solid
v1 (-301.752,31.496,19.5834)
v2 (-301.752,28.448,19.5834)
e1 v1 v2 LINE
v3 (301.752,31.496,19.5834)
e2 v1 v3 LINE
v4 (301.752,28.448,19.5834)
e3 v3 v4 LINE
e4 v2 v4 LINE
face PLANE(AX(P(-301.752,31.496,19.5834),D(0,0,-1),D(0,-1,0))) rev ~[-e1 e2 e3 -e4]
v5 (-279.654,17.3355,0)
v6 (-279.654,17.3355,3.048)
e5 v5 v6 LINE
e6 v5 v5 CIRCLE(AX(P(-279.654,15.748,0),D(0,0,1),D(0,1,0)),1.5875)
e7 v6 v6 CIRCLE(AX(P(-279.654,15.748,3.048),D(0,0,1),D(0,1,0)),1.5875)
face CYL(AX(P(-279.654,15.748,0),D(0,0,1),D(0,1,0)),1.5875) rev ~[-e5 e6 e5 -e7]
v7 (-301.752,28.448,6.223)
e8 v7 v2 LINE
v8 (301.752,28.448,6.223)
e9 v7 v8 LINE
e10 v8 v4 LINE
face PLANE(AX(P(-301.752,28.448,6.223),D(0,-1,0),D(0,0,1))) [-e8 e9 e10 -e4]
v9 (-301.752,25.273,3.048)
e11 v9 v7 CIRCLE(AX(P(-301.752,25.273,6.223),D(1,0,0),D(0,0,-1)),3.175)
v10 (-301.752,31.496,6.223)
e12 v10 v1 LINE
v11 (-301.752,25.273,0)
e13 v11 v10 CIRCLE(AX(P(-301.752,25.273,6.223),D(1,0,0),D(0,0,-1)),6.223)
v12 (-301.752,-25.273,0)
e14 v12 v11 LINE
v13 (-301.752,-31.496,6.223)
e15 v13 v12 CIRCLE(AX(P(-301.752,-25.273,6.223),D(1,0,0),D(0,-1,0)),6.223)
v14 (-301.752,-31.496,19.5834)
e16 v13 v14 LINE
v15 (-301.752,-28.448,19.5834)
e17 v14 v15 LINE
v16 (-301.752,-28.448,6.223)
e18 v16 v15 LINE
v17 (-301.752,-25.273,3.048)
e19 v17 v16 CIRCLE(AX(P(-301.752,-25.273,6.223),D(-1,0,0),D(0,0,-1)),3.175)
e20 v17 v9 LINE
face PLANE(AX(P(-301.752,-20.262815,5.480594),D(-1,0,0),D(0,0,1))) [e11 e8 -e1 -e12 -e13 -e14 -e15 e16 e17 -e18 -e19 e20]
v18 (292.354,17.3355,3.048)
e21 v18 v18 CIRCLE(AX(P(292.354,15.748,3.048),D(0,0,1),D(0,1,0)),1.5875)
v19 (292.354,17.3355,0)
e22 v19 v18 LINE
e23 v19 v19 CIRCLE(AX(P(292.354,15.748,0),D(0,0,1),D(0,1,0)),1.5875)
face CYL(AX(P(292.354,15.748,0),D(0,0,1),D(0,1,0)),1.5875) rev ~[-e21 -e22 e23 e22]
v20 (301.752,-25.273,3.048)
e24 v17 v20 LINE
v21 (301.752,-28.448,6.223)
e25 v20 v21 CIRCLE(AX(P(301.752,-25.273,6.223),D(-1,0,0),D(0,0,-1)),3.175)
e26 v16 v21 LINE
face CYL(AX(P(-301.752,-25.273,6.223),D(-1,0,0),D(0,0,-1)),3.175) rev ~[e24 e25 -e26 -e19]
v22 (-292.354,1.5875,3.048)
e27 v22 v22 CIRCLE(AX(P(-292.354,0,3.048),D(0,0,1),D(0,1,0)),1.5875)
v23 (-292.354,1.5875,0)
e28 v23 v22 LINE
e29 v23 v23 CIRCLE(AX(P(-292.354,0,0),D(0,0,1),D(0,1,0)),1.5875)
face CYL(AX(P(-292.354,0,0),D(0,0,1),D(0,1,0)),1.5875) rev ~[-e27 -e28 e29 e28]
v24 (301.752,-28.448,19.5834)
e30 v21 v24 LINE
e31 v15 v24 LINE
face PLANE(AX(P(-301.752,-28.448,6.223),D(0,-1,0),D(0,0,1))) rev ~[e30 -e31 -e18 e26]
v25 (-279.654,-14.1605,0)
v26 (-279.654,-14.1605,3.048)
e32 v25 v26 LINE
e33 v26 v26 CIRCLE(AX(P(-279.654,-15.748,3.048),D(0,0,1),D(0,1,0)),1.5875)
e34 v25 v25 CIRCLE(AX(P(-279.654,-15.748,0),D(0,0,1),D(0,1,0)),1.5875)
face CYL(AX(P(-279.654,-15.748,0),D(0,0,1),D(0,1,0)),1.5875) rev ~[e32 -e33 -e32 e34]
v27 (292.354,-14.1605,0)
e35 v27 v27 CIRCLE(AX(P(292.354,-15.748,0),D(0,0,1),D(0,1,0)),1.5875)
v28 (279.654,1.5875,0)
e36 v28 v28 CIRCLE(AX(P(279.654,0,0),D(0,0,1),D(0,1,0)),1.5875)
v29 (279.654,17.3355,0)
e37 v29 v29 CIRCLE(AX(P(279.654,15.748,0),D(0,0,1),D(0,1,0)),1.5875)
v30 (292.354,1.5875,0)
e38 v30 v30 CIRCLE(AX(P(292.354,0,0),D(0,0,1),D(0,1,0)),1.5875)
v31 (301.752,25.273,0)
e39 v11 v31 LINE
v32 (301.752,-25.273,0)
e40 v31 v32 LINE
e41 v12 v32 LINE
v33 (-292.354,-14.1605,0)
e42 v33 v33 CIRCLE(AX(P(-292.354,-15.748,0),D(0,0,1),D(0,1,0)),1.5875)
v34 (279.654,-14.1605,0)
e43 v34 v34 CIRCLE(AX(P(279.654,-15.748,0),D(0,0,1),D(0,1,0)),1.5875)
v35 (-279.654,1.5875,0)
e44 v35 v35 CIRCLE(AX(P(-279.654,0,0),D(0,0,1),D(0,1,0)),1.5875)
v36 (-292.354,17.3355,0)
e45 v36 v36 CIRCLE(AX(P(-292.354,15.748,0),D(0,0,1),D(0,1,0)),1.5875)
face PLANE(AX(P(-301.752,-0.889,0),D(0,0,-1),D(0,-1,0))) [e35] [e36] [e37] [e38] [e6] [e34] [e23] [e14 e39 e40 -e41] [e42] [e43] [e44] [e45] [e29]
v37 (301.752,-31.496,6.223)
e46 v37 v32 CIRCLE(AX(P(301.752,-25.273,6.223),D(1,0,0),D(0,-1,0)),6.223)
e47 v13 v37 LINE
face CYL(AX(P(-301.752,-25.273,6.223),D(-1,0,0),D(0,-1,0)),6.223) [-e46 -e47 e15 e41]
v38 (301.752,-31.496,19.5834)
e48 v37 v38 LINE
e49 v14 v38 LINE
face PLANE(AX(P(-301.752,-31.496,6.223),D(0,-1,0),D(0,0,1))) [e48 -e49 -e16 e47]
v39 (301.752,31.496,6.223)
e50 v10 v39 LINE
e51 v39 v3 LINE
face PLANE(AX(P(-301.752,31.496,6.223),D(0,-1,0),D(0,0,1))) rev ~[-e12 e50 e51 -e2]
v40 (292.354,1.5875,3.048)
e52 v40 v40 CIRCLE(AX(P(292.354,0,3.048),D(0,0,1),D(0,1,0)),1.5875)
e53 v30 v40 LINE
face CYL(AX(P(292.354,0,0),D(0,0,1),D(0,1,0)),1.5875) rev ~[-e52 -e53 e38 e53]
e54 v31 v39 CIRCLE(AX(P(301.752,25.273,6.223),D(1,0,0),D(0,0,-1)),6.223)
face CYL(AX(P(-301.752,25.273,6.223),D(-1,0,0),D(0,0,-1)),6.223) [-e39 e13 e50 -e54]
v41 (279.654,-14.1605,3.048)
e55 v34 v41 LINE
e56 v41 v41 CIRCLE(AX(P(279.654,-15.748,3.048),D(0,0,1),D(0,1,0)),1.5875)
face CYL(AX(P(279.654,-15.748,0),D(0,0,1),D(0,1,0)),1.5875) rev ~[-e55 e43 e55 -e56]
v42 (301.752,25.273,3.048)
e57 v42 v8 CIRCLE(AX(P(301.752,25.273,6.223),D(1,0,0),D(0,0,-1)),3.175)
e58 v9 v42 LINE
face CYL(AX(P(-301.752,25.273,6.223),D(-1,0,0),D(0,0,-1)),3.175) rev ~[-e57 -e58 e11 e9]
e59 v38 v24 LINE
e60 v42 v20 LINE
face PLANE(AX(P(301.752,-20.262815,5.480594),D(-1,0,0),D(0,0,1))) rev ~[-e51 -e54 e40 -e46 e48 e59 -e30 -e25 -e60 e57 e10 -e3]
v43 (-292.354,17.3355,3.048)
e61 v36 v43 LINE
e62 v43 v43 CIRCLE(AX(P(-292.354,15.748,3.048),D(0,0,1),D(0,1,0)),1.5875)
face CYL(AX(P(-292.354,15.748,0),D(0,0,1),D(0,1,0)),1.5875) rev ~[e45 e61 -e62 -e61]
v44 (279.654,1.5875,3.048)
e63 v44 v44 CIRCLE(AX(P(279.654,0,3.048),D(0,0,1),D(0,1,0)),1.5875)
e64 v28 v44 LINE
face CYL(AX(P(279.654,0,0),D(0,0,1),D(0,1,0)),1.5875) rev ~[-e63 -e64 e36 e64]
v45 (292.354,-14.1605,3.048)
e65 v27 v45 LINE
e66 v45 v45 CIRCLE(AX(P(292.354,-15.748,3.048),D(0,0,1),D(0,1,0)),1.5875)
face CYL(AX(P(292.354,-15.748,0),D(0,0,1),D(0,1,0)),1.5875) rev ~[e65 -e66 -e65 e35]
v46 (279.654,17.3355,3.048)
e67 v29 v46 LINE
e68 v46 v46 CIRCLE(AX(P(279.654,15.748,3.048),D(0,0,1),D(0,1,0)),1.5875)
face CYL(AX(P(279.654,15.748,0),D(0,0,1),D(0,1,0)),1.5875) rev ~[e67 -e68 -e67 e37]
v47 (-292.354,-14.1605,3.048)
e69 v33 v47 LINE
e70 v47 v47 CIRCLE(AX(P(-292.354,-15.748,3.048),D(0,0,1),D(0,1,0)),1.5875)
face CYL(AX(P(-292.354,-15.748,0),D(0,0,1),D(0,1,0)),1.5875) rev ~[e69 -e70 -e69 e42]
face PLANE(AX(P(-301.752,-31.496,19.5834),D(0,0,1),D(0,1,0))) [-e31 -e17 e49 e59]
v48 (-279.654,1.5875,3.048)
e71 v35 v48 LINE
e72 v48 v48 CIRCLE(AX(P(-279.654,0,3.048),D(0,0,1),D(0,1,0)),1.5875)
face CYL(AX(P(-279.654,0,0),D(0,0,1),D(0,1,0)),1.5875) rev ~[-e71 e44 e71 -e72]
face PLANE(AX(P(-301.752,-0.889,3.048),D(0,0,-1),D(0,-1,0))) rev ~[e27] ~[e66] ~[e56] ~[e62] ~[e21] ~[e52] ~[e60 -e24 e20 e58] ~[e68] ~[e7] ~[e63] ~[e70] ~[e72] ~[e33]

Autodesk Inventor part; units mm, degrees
ref_plane "YZ Plane" through (0, 0, 0) normal (1, 0, 0) x (0, 1, 0)
ref_plane "XZ Plane" through (0, 0, 0) normal (0, 1, 0) x (-1, 0, 0)
ref_plane "XY Plane" through (0, 0, 0) normal (0, 0, 1) x (1, 0, 0)
sketch "Sketch2" plane through (0, 0, 0) normal (0, 0, 1) x (1, 0, 0)
  line L0 (-301.752, 25.273) -> (301.752, 25.273)
  line L1 (301.752, 25.273) -> (301.752, -25.273)
  line L2 (301.752, -25.273) -> (-301.752, -25.273)
  line L3 (-301.752, -25.273) -> (-301.752, 25.273)
  point P0 (0, 0)
  dimension "d0" = 301.752
  dimension "d1" = 301.752
  dimension "d2" = 25.273
  dimension "d3" = 25.273
extrude "Plate1" add sketch "Sketch2" along normal blind 3.048
sketch "Sketch3" plane through (301.752, -25.273, 0) normal (1, 0, 0) x (0, 0, -1)
  line L0 (0, 50.546) -> (-3.048, 50.546)
  arc A0 (0, 50.546) -> (-6.223, 56.769) centre (-6.223, 50.546) ccw
  line L1 (-6.223, 50.546) -> (-6.223, 56.769) construction
  line L2 (-6.223, 50.546) -> (0, 50.546) construction
  line L3 (-6.223, 56.769) -> (-19.5834, 56.769)
  point P0 (0, 25.273)
  dimension "d5" = 90
  dimension "d6" = 6.223
  dimension "d7" = 6.223
  dimension "d8" = 13.3604
contour flange "Contour Flange1" sketch "Sketch3" thickness 3.048 bend radius 3.048 curves A0 L3 edges at (0, 25.273, 0) running between points at (-301.752, 25.273, 0) (301.752, 25.273, 0)
bend "Bend1"
corner "Corner1"
sketch "Sketch4" plane through (301.752, -25.273, 3.048) normal (1, 0, 0) x (0, 0, -1)
  line L0 (3.048, 0) -> (0, 0)
  arc A0 (-3.175, -6.223) -> (3.048, 0) centre (-3.175, 0) ccw
  line L1 (-3.175, 0) -> (-3.175, -6.223) construction
  line L2 (-3.175, 0) -> (3.048, 0) construction
  line L3 (-3.175, -6.223) -> (-16.5354, -6.223)
  point P0 (3.048, 25.273)
  dimension "d18" = 90
  dimension "d19" = 6.223
  dimension "d20" = 6.223
  dimension "d21" = 13.3604
contour flange "Contour Flange2" sketch "Sketch4" thickness 3.048 bend radius 3.048 curves L3 A0 edges at (0, -25.273, 0) running between points at (301.752, -25.273, 0) (-301.752, -25.273, 0)
bend "Bend2"
corner "Corner2"
sketch "Sketch5" plane through (0, 0, 0) normal (0, 0, -1) x (-1, 0, 0)
  line L0 (-301.752, 25.273) -> (-301.752, -25.273) projected
  line L1 (-301.752, -25.273) -> (301.752, -25.273) projected
  line L2 (301.752, -25.273) -> (301.752, 25.273) projected
  point P0 (0, 0)
  point P1 (-292.354, -15.748)
  point P2 (279.654, -15.748)
  dimension "d31" = 9.398
  dimension "d32" = 22.098
  dimension "d33" = 9.525
  dimension "d34" = 9.525
hole "Hole1" at (292.354, -15.748, 0) at (-279.654, -15.748, 0) direction (0, 0, 1) diameter 3.175 end through all
sketch "Sketch6" plane through (0, 0, 0) normal (0, 0, -1) x (-1, 0, 0)
  circle A0 centre (-292.354, -15.748) radius 1.5875 projected
  line L0 (301.752, -25.273) -> (301.752, 25.273) projected
  line L1 (-292.354, -15.748) -> (-277.2602, -15.748)
  point P0 (0, 0)
sketch "Sketch7" plane through (0, 0, 0) normal (0, 0, -1) x (-1, 0, 0)
  circle A0 centre (-292.354, -15.748) radius 1.5875 projected
  line L0 (301.752, -25.273) -> (301.752, 25.273) projected
  line L1 (-292.354, -15.748) -> (-292.354, -4.4863)
  point P0 (0, 0)
pattern_linear "Rectangular Pattern1" count 2 spacing 12.7 along (-1, 0, 0) count 3 spacing 15.748 along (0, 1, 0) of "Hole1"
equation "\"d34\" = d33"
equation "\"d40\" = Thickness"
equation "\"d9\" = BendReliefWidth"
equation "\"d10\" = BendReliefDepth"
equation "\"d11\" = MinimumRemnant"
equation "\"d12\" = BendRadius"
equation "\"d13\" = BendRadius"
equation "\"d15\" = CornerReliefSize"
equation "\"d16\" = GapSize"
equation "\"d17\" = JacobiRadiusSize"
equation "\"d22\" = BendReliefWidth"
equation "\"d23\" = BendReliefDepth"
equation "\"d24\" = MinimumRemnant"
equation "\"d25\" = BendRadius"
equation "\"d26\" = BendRadius"
equation "\"d28\" = CornerReliefSize"
equation "\"d29\" = GapSize"
equation "\"d30\" = JacobiRadiusSize"
equation "\"d1\" = d0"
equation "\"d3\" = d2"
equation "\"BendRadius\" = Thickness"
equation "\"BendReliefWidth\" = Thickness"
equation "\"BendReliefDepth\" = 0.5 * Thickness"
equation "\"CornerReliefSize\" = 4 * Thickness"
equation "\"MinimumRemnant\" = 2 * Thickness"
equation "\"TransitionRadius\" = BendRadius"
equation "\"JacobiRadiusSize\" = BendRadius"
equation "\"GapSize\" = Thickness"
equation "\"d4\" = BendRadius"
equation "\"Thickness\" = 3.048"
properties part number "Base Back Bar"
